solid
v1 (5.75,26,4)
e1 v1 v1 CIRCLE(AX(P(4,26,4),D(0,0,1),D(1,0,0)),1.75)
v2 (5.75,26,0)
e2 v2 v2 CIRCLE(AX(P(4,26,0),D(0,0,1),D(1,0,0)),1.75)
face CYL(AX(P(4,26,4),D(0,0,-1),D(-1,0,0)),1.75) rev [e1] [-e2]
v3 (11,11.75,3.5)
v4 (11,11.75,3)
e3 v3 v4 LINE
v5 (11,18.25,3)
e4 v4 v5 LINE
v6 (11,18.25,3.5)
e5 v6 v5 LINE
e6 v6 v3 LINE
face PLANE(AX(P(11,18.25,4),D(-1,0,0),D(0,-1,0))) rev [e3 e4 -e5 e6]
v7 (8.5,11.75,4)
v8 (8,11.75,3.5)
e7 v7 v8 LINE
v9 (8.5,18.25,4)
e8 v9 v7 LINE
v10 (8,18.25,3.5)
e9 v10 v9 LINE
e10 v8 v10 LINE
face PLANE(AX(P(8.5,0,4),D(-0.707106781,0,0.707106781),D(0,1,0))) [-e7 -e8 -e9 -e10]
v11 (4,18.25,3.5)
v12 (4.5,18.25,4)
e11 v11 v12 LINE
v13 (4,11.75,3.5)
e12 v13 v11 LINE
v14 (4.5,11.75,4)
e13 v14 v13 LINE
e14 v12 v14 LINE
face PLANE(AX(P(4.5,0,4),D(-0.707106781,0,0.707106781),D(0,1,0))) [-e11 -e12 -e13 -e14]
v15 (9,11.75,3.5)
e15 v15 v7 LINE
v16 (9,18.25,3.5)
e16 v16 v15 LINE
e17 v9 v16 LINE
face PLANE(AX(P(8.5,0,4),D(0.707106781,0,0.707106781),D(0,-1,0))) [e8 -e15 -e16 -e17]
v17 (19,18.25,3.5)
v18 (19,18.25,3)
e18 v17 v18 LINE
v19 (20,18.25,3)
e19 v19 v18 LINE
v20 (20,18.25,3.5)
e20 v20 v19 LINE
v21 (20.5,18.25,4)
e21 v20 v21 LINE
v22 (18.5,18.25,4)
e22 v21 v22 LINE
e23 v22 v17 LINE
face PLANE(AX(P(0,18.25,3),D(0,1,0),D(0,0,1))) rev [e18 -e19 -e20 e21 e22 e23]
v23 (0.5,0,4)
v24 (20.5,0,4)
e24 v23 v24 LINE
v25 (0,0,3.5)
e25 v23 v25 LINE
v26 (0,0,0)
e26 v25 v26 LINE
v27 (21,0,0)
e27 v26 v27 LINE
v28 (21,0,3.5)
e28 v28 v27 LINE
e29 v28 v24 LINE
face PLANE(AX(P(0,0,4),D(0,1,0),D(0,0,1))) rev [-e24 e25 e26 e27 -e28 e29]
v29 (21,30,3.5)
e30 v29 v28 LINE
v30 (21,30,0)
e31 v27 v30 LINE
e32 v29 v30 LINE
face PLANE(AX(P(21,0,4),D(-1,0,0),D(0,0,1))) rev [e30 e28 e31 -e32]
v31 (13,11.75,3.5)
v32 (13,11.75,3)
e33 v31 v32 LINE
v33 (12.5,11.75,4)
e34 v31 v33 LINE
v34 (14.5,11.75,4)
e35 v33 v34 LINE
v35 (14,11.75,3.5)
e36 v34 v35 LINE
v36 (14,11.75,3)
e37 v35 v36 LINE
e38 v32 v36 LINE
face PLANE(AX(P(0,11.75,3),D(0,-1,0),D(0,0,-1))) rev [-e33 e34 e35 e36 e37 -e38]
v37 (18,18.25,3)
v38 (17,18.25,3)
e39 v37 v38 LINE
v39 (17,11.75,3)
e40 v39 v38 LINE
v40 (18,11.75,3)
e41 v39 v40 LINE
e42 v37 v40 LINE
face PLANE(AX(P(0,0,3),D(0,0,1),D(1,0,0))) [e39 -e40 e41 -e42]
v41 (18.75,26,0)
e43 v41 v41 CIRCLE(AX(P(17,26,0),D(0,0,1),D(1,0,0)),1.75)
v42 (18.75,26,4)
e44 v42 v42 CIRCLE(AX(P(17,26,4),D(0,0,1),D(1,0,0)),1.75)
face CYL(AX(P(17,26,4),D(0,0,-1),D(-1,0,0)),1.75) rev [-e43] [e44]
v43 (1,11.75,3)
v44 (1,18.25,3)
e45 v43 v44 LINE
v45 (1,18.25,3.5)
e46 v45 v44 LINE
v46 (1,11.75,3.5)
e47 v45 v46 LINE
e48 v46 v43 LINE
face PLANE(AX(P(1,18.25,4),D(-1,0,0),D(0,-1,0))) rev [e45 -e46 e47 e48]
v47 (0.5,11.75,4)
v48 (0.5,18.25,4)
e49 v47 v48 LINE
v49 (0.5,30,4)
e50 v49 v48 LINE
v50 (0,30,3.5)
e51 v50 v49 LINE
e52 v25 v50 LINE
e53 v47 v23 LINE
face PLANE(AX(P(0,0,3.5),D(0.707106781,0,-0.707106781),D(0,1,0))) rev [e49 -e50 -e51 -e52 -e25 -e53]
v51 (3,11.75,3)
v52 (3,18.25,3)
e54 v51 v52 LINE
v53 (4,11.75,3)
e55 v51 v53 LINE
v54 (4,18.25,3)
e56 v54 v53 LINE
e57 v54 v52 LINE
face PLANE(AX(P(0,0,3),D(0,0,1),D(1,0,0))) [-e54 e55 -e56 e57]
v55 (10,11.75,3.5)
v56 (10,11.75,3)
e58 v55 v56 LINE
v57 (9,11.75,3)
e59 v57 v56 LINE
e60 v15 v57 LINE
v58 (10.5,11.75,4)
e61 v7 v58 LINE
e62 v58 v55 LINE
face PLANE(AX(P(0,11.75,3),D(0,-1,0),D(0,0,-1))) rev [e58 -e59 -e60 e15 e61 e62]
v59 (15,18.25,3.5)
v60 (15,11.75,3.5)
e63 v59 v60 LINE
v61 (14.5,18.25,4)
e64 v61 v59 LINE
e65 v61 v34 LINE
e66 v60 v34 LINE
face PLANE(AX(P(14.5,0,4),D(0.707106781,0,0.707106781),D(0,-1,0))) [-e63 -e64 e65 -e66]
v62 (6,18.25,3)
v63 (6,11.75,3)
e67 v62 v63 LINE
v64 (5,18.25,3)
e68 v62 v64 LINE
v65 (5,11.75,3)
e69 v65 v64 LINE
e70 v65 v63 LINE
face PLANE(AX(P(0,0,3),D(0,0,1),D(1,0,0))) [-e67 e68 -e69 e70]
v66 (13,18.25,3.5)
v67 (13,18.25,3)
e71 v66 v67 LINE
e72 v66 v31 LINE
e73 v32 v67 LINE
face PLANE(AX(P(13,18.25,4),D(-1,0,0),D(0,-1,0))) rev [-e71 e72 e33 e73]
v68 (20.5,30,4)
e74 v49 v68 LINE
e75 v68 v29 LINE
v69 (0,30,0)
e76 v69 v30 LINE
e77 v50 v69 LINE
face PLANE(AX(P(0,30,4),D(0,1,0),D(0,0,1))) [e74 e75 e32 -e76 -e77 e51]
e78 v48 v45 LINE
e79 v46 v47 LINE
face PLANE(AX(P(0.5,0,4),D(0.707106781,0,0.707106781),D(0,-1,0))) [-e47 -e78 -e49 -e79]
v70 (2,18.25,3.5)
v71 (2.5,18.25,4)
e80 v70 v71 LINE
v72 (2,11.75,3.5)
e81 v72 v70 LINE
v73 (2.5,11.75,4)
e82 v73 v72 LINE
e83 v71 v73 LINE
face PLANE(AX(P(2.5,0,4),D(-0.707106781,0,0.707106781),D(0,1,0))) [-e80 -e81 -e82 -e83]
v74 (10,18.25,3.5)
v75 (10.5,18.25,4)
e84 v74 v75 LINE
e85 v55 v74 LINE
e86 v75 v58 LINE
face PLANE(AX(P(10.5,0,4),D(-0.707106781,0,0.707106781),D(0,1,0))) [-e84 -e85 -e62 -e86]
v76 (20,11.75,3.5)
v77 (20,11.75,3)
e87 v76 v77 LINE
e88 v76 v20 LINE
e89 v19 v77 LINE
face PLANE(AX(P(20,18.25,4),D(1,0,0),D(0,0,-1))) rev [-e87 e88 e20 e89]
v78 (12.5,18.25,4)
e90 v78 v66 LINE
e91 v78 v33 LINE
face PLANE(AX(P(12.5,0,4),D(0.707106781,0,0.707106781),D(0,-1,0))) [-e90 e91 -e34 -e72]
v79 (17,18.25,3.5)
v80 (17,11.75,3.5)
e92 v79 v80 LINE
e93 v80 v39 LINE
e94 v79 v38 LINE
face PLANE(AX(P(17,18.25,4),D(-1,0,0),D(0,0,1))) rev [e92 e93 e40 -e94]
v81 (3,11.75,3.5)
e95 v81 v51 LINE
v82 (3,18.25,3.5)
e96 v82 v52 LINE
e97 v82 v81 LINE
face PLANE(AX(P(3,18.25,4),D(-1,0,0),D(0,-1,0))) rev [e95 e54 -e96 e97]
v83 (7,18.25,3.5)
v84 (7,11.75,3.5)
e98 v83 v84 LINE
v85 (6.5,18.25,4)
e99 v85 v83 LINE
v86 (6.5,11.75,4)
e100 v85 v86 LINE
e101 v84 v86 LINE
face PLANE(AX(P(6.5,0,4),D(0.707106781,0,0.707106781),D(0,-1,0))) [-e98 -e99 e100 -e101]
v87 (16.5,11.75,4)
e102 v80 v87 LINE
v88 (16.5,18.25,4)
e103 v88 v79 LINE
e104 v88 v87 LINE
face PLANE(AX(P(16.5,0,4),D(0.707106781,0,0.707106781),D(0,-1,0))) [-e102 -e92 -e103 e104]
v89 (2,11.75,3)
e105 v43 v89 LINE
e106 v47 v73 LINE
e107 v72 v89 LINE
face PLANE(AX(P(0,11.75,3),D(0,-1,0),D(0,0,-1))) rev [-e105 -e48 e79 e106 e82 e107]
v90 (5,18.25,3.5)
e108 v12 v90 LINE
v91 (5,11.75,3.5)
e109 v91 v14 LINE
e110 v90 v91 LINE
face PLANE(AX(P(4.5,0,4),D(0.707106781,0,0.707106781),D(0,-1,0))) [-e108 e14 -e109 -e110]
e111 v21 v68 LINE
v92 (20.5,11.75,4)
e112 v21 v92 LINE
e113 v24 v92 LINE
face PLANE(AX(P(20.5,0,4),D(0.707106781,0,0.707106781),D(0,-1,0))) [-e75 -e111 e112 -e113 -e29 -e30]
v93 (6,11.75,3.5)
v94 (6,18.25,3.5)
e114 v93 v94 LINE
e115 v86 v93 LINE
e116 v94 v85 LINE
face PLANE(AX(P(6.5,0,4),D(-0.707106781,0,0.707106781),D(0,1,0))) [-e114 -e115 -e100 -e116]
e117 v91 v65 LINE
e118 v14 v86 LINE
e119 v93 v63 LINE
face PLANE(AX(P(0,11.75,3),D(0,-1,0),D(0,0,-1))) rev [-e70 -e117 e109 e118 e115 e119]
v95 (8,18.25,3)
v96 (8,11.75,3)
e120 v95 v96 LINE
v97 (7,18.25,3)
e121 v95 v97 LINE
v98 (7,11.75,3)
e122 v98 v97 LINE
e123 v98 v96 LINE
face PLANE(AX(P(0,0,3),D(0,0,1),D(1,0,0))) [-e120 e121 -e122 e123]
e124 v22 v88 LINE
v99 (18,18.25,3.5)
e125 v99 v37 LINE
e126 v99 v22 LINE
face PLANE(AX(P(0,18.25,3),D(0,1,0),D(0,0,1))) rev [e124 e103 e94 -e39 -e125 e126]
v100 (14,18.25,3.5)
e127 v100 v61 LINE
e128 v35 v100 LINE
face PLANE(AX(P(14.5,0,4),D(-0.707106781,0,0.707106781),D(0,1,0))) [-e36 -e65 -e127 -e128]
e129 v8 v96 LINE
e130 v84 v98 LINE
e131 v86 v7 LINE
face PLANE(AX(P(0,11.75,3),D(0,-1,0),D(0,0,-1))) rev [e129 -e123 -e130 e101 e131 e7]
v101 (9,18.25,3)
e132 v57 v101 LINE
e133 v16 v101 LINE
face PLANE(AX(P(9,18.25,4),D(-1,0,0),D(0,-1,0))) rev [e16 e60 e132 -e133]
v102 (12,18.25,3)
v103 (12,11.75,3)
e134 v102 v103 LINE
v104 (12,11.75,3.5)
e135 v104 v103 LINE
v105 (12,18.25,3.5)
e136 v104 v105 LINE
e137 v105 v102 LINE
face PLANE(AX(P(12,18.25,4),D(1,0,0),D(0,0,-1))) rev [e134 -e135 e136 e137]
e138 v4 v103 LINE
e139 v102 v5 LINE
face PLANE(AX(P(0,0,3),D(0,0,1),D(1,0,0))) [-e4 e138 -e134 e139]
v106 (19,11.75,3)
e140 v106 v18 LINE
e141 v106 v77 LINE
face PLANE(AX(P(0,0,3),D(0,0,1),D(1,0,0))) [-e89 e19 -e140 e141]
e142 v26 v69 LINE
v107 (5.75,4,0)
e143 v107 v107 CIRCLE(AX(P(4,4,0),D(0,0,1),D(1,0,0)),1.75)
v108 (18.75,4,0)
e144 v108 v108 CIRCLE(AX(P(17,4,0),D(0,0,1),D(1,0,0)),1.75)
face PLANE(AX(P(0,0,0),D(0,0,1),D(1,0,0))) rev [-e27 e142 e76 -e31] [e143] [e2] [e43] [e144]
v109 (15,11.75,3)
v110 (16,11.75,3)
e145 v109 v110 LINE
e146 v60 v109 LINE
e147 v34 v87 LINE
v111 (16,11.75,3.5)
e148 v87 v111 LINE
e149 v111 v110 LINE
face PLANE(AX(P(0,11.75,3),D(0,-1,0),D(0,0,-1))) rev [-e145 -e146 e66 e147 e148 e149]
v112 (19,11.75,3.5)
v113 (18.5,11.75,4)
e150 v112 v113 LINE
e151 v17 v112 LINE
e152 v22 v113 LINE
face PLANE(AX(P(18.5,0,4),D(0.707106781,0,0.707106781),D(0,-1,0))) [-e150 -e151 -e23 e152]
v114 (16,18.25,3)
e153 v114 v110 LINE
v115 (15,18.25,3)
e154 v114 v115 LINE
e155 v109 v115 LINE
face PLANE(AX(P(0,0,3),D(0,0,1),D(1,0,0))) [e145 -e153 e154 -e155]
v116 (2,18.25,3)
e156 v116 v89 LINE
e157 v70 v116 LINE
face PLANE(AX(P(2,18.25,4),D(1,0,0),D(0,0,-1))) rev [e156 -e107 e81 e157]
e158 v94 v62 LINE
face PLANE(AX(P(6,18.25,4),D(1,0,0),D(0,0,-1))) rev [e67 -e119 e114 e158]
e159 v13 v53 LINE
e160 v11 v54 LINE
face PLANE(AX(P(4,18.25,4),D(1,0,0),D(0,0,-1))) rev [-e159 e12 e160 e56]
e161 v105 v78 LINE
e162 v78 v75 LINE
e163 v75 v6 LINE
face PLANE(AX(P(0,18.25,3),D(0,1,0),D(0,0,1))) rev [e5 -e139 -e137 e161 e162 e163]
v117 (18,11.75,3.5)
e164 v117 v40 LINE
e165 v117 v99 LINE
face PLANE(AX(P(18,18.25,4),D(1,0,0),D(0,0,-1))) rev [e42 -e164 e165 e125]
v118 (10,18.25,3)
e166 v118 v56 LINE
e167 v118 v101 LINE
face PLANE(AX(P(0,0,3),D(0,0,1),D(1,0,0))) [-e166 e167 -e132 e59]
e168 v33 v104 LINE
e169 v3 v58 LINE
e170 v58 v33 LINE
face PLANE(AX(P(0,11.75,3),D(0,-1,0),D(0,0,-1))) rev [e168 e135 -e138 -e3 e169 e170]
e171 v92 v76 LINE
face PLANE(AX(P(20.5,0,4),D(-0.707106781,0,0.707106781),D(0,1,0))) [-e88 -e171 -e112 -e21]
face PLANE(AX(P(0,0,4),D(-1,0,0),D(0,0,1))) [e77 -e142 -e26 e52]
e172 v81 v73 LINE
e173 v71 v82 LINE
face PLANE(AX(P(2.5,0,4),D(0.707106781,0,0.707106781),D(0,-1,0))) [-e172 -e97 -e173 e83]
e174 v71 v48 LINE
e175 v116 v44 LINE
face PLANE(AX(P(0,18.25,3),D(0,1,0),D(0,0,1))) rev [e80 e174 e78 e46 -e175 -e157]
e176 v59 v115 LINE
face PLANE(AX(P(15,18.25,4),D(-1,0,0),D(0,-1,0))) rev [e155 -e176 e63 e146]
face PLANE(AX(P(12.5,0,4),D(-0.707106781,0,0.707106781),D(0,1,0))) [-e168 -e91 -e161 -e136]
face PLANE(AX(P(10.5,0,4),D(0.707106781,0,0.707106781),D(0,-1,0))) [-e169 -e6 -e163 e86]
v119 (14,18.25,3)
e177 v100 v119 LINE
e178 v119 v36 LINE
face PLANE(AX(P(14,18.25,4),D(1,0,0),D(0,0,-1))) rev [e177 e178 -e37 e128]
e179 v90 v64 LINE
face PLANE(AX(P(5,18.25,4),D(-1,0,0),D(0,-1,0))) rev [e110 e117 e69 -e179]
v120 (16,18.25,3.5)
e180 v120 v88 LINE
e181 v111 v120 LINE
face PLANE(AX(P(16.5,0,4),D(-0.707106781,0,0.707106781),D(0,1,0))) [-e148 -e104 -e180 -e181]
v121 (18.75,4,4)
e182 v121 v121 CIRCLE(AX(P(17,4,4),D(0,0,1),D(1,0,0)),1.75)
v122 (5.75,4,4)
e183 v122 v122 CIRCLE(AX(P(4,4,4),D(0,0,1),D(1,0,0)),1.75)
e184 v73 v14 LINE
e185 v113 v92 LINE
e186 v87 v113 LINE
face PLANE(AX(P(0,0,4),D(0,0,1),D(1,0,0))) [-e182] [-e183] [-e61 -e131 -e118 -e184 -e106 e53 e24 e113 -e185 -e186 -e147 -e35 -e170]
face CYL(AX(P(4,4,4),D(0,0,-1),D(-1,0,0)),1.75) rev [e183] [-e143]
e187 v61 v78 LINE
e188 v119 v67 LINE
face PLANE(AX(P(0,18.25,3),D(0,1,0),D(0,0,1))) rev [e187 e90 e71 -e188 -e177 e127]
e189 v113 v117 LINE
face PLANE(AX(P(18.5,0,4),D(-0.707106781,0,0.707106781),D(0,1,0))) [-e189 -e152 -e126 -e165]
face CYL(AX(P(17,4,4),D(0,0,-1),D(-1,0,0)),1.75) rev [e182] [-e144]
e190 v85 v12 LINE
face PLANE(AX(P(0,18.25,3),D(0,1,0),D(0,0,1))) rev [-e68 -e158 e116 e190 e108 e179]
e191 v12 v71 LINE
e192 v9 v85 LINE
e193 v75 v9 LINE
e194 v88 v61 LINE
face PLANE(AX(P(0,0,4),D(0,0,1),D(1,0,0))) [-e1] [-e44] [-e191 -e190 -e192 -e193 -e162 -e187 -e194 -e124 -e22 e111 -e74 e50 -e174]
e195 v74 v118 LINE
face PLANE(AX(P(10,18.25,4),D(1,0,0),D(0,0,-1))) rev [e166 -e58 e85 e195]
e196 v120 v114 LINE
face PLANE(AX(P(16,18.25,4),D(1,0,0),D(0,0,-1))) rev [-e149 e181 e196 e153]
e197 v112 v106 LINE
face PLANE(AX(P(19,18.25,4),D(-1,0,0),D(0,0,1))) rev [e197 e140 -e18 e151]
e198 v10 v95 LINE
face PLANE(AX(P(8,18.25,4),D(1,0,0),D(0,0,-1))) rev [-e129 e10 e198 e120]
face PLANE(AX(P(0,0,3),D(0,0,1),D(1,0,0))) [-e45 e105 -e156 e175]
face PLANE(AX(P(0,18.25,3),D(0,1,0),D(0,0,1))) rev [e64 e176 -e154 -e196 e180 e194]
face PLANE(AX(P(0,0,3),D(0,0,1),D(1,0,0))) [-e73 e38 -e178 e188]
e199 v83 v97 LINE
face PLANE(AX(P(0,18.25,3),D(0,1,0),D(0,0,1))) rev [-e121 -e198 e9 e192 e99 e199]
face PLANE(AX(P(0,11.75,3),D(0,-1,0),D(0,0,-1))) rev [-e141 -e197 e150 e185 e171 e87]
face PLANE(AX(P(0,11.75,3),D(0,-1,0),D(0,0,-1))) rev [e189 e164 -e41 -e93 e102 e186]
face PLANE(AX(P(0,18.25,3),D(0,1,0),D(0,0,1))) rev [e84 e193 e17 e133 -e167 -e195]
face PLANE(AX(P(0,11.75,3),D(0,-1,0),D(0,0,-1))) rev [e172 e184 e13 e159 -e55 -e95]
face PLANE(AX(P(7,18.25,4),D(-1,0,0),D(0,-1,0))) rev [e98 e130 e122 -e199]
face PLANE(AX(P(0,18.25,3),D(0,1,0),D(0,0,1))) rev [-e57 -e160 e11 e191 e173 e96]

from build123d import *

# Parameters (mm, degrees)
SKETCH1_W           = 21
SKETCH1_H           = 30
SKETCH1_R           = 1.75
BOSS_EXTRUDE1_DEPTH = 4
SKETCH2_W           = 21
SKETCH2_H           = 6.5
CUT_EXTRUDE1_DEPTH  = 1
SKETCH3_W           = 1
SKETCH3_H           = 6.5
BOSS_EXTRUDE2_DEPTH = 1
CHAMFER1_SIZE       = 0.5
CHAMFER2_SIZE       = 0.5


with BuildPart() as part:
    # Sketch1 → Boss-Extrude1 (new body)
    with BuildSketch(Plane.XY):
        with Locations((10.5, 15)):
            Rectangle(SKETCH1_W, SKETCH1_H)
        with Locations((4, 4)):
            Circle(SKETCH1_R, mode=Mode.SUBTRACT)
        with Locations((17, 4)):
            Circle(SKETCH1_R, mode=Mode.SUBTRACT)
        with Locations((17, 26)):
            Circle(SKETCH1_R, mode=Mode.SUBTRACT)
        with Locations((4, 26)):
            Circle(SKETCH1_R, mode=Mode.SUBTRACT)
    extrude(amount=BOSS_EXTRUDE1_DEPTH)

    # Sketch2 → Cut-Extrude1 (cut)
    with BuildSketch(Plane.XY.offset(4)):
        with Locations((10.5, 15)):
            Rectangle(SKETCH2_W, SKETCH2_H)
    extrude(amount=-CUT_EXTRUDE1_DEPTH, mode=Mode.SUBTRACT)

    # Sketch3 → Boss-Extrude2 (add)
    with BuildSketch(Plane.XY.offset(3)):
        with Locations((0.5, 15)):
            Rectangle(SKETCH3_W, SKETCH3_H)
        with Locations((2.5, 15)):
            Rectangle(SKETCH3_W, SKETCH3_H)
        with Locations((4.5, 15)):
            Rectangle(SKETCH3_W, SKETCH3_H)
        with Locations((6.5, 15)):
            Rectangle(SKETCH3_W, SKETCH3_H)
        with Locations((8.5, 15)):
            Rectangle(SKETCH3_W, SKETCH3_H)
        with Locations((10.5, 15)):
            Rectangle(SKETCH3_W, SKETCH3_H)
        with Locations((12.5, 15)):
            Rectangle(SKETCH3_W, SKETCH3_H)
        with Locations((14.5, 15)):
            Rectangle(SKETCH3_W, SKETCH3_H)
        with Locations((16.5, 15)):
            Rectangle(SKETCH3_W, SKETCH3_H)
        with Locations((18.5, 15)):
            Rectangle(SKETCH3_W, SKETCH3_H)
        with Locations((20.5, 15)):
            Rectangle(SKETCH3_W, SKETCH3_H)
    extrude(amount=BOSS_EXTRUDE2_DEPTH)

    # Chamfer1
    chamfer1_edges = [part.edges().sort_by_distance(p)[0] for p in [
        (8, 15, 4),
        (9, 15, 4),
        (10, 15, 4),
        (11, 15, 4),
        (12, 15, 4),
        (13, 15, 4),
        (14, 15, 4),
        (15, 15, 4),
        (16, 15, 4),
        (17, 15, 4),
        (18, 15, 4),
        (19, 15, 4),
        (20, 15, 4),
        (1, 15, 4),
        (2, 15, 4),
        (3, 15, 4),
        (4, 15, 4),
        (5, 15, 4),
        (6, 15, 4),
        (7, 15, 4),
    ]]
    chamfer(chamfer1_edges, length=CHAMFER1_SIZE - 0.0001)  # a hair under: the kernel refuses the full size

    # Chamfer2
    chamfer2_edges = [part.edges().sort_by_distance(p)[0] for p in [
        (21, 15, 4),
        (0, 15, 4),
    ]]
    chamfer(chamfer2_edges, length=CHAMFER2_SIZE)


solid = part.part
